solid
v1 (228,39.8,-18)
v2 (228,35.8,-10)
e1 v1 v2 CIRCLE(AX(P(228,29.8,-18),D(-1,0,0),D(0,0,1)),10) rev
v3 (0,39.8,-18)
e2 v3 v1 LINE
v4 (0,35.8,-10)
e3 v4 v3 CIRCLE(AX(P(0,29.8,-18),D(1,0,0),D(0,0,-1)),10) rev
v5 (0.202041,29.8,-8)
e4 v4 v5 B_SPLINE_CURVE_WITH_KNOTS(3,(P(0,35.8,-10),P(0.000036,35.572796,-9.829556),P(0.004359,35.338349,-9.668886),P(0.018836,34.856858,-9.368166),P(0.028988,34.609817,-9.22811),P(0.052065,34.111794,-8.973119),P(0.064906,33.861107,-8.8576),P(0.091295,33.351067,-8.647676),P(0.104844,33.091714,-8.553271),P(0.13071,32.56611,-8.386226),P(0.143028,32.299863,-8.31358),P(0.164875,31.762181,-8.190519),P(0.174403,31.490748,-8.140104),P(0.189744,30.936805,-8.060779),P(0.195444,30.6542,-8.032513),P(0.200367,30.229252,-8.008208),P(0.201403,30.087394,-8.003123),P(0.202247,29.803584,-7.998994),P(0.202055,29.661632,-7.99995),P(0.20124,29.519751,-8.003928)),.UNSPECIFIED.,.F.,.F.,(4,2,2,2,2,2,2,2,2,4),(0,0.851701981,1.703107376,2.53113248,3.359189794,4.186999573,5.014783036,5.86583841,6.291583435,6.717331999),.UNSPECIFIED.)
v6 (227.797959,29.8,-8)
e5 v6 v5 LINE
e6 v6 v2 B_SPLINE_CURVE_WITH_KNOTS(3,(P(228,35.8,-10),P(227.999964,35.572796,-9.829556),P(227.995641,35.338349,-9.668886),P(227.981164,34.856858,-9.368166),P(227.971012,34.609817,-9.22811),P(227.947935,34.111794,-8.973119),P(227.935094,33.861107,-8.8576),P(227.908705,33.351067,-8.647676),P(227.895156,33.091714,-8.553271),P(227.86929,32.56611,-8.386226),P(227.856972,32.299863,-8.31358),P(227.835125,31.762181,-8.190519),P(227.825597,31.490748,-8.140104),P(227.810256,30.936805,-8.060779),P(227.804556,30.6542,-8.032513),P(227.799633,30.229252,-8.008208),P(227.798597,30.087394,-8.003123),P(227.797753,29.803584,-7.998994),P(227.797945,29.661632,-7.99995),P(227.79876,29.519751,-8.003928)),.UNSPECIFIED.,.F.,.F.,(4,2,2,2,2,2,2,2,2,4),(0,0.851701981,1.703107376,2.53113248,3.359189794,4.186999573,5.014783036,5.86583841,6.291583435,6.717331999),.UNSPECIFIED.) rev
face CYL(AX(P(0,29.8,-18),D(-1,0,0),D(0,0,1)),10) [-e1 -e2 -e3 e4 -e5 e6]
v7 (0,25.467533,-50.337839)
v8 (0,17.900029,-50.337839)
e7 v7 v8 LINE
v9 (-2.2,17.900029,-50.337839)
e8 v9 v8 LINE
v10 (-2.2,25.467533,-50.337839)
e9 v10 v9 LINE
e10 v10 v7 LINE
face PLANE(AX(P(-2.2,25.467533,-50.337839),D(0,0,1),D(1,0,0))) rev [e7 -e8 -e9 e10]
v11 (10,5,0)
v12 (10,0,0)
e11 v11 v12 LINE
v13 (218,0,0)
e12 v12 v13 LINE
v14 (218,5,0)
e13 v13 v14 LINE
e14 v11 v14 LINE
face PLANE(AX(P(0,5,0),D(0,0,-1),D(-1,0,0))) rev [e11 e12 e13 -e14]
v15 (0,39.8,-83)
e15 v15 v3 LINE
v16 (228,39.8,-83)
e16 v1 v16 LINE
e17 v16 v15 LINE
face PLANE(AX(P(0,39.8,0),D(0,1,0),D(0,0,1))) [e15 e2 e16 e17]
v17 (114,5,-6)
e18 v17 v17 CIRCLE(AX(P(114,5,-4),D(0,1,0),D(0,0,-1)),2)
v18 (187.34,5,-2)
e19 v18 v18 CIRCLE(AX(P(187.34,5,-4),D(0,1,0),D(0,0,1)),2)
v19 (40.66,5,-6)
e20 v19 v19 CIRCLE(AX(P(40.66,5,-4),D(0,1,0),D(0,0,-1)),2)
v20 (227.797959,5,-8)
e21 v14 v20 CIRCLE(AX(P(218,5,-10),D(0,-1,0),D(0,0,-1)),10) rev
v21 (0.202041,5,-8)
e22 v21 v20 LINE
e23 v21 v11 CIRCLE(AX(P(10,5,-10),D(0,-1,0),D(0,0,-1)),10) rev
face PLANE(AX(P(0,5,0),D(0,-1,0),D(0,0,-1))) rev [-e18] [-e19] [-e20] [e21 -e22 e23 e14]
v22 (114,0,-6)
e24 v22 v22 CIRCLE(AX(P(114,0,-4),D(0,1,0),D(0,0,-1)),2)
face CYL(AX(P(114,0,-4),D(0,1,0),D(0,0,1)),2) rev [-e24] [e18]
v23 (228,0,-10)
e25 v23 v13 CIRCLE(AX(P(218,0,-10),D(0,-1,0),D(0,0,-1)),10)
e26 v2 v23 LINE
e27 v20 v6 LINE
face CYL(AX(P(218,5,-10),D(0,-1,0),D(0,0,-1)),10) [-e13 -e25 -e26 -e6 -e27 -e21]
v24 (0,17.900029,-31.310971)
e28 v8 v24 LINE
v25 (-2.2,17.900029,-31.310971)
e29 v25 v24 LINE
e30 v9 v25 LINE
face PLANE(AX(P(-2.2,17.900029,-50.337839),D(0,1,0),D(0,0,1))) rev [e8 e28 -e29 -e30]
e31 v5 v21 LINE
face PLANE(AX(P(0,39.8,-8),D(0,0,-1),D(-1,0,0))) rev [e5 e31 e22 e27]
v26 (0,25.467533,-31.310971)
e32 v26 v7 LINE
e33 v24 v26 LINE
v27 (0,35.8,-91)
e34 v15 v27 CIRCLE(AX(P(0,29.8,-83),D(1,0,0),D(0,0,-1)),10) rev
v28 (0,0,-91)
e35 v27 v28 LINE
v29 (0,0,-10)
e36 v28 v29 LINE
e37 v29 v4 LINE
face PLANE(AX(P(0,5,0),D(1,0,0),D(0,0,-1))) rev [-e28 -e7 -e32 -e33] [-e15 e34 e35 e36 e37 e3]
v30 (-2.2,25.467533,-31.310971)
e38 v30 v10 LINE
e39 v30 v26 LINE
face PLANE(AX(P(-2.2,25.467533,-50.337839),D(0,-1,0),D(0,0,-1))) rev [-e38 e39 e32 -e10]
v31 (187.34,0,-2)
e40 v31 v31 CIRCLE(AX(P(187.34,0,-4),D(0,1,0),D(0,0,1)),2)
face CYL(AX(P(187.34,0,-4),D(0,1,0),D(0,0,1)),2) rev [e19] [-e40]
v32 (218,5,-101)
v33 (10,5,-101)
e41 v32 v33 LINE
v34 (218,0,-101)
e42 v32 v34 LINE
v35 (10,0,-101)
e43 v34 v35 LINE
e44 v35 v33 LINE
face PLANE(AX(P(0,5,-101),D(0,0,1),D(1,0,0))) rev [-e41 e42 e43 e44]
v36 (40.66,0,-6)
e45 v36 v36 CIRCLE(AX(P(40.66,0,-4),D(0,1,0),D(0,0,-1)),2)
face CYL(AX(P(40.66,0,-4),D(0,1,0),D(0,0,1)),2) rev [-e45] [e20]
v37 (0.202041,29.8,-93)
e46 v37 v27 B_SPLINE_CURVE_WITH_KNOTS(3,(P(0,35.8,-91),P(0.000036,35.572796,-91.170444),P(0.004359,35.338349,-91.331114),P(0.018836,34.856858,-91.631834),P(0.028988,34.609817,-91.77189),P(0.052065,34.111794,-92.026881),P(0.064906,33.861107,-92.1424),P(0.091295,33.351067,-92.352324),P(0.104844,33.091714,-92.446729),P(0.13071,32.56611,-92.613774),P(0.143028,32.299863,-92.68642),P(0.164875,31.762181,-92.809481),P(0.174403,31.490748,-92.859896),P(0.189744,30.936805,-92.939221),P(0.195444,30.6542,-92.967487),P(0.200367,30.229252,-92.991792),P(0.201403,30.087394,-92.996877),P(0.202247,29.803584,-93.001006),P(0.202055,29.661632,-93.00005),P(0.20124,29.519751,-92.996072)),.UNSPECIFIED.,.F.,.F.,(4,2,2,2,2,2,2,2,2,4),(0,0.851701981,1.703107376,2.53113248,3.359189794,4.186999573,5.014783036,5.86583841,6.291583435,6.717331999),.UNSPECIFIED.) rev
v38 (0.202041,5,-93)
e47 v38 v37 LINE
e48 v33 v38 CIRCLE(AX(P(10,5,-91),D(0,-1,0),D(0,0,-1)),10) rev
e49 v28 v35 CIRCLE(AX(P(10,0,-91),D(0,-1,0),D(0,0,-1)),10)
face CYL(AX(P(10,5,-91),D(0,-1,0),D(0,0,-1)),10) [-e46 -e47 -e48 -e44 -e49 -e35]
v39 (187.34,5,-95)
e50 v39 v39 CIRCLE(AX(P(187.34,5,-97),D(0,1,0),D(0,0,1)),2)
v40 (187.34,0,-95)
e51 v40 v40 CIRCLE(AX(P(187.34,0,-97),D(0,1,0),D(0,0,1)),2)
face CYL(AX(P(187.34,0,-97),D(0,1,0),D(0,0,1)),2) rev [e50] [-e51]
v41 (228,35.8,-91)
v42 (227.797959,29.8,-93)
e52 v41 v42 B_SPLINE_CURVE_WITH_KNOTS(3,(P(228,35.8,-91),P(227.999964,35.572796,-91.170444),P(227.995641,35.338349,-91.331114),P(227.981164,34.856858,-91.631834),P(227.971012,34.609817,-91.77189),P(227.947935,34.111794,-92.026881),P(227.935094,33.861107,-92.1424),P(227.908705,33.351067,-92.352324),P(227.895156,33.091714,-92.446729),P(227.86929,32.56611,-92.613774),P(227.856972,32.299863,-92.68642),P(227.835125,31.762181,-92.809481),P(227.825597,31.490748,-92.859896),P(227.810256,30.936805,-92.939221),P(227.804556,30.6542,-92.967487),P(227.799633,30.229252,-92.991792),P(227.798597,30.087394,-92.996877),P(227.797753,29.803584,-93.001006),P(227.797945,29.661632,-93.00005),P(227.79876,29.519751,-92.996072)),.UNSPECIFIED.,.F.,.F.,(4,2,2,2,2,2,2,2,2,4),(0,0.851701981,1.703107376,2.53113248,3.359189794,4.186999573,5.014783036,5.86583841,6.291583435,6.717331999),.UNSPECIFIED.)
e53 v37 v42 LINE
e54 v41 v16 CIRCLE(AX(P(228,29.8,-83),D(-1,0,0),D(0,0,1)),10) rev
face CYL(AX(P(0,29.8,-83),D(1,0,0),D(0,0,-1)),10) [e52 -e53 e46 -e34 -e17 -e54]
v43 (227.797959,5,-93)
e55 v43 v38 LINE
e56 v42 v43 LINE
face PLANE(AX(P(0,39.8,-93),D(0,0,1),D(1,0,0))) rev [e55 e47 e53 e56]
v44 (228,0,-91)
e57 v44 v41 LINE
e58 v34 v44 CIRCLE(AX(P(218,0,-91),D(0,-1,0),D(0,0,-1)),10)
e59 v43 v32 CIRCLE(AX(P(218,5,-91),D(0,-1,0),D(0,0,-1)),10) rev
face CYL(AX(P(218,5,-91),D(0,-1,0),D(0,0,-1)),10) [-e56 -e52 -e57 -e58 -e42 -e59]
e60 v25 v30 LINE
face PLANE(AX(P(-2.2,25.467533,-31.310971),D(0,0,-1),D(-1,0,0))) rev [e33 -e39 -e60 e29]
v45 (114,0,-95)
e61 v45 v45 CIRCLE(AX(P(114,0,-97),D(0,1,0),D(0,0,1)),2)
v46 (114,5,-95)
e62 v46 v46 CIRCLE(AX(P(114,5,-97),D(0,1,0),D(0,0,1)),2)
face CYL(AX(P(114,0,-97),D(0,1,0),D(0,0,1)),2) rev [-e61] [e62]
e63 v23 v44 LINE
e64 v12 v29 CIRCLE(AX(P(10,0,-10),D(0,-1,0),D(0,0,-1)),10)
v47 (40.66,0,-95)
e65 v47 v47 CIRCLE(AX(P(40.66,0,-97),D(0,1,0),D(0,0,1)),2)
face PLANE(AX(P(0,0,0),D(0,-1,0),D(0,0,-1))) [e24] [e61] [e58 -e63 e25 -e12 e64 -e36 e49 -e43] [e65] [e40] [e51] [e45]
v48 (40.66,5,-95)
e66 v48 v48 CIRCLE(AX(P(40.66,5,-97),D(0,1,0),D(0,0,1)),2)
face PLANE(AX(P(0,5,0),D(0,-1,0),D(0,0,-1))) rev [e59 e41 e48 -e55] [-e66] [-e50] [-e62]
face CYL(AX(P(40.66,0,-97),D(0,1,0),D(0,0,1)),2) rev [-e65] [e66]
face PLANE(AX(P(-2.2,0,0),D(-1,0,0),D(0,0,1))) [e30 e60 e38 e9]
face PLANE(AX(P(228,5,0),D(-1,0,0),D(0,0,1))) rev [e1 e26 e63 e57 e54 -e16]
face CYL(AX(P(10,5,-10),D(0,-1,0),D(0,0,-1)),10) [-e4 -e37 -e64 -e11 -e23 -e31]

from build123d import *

# Parameters (mm, degrees)
SKETCH1_W           = 228
SKETCH1_H           = 101
BOSS_EXTRUDE1_DEPTH = 5
SKETCH2_R           = 2
CUT_EXTRUDE1_DEPTH  = 250.419325635
SKETCH3_W           = 228
SKETCH3_H           = 85
BOSS_EXTRUDE2_DEPTH = 34.8
SKETCH4_W           = 19.026867748
SKETCH4_H           = 7.567504218
BOSS_EXTRUDE3_DEPTH = 2.2
FILLET1_R           = 10


with BuildPart() as part:
    # Sketch1 → Boss-Extrude1 (new body)
    with BuildSketch(Plane(origin=(0, 0, 0), x_dir=(1, 0, 0), z_dir=(0, 1, 0))):
        with Locations((114, 50.5)):
            Rectangle(SKETCH1_W, SKETCH1_H)
    extrude(amount=BOSS_EXTRUDE1_DEPTH)

    # Sketch2 → Cut-Extrude1 (cut, through all)
    with BuildSketch(Plane(origin=(0, 5, 0), x_dir=(1, 0, 0), z_dir=(0, 1, 0))):
        with Locations((187.34, 97)):
            Circle(SKETCH2_R)
        with Locations((187.34, 4)):
            Circle(SKETCH2_R)
        with Locations((114, 97)):
            Circle(SKETCH2_R)
        with Locations((40.66, 97)):
            Circle(SKETCH2_R)
        with Locations((114, 4)):
            Circle(SKETCH2_R)
        with Locations((40.66, 4)):
            Circle(SKETCH2_R)
    extrude(amount=-CUT_EXTRUDE1_DEPTH, mode=Mode.SUBTRACT)

    # Sketch3 → Boss-Extrude2 (add)
    with BuildSketch(Plane(origin=(0, 5, 0), x_dir=(1, 0, 0), z_dir=(0, 1, 0))):
        with Locations((114, 50.5)):
            Rectangle(SKETCH3_W, SKETCH3_H)
    extrude(amount=BOSS_EXTRUDE2_DEPTH)

    # Sketch4 → Boss-Extrude3 (add)
    with BuildSketch(Plane.ZY):
        with Locations((-40.824405321, 21.683781351)):
            Rectangle(SKETCH4_W, SKETCH4_H)
    extrude(amount=BOSS_EXTRUDE3_DEPTH)

    # Fillet1
    fillet1_edges = [part.edges().sort_by_distance(p)[0] for p in [
        (0, 2.5, 0),
    ]]
    fillet(fillet1_edges, radius=FILLET1_R)
    fillet1_2_edges = [part.edges().sort_by_distance(p)[0] for p in [
        (228, 2.5, 0),
    ]]
    fillet(fillet1_2_edges, radius=FILLET1_R)
    fillet1_3_edges = [part.edges().sort_by_distance(p)[0] for p in [
        (0, 2.5, -101),
    ]]
    fillet(fillet1_3_edges, radius=FILLET1_R)
    fillet1_4_edges = [part.edges().sort_by_distance(p)[0] for p in [
        (228, 2.5, -101),
    ]]
    fillet(fillet1_4_edges, radius=FILLET1_R)
    fillet1_5_edges = [part.edges().sort_by_distance(p)[0] for p in [
        (114, 39.8, -93),
    ]]
    fillet(fillet1_5_edges, radius=FILLET1_R)
    fillet1_6_edges = [part.edges().sort_by_distance(p)[0] for p in [
        (114, 39.8, -8),
    ]]
    fillet(fillet1_6_edges, radius=FILLET1_R)


solid = part.part
